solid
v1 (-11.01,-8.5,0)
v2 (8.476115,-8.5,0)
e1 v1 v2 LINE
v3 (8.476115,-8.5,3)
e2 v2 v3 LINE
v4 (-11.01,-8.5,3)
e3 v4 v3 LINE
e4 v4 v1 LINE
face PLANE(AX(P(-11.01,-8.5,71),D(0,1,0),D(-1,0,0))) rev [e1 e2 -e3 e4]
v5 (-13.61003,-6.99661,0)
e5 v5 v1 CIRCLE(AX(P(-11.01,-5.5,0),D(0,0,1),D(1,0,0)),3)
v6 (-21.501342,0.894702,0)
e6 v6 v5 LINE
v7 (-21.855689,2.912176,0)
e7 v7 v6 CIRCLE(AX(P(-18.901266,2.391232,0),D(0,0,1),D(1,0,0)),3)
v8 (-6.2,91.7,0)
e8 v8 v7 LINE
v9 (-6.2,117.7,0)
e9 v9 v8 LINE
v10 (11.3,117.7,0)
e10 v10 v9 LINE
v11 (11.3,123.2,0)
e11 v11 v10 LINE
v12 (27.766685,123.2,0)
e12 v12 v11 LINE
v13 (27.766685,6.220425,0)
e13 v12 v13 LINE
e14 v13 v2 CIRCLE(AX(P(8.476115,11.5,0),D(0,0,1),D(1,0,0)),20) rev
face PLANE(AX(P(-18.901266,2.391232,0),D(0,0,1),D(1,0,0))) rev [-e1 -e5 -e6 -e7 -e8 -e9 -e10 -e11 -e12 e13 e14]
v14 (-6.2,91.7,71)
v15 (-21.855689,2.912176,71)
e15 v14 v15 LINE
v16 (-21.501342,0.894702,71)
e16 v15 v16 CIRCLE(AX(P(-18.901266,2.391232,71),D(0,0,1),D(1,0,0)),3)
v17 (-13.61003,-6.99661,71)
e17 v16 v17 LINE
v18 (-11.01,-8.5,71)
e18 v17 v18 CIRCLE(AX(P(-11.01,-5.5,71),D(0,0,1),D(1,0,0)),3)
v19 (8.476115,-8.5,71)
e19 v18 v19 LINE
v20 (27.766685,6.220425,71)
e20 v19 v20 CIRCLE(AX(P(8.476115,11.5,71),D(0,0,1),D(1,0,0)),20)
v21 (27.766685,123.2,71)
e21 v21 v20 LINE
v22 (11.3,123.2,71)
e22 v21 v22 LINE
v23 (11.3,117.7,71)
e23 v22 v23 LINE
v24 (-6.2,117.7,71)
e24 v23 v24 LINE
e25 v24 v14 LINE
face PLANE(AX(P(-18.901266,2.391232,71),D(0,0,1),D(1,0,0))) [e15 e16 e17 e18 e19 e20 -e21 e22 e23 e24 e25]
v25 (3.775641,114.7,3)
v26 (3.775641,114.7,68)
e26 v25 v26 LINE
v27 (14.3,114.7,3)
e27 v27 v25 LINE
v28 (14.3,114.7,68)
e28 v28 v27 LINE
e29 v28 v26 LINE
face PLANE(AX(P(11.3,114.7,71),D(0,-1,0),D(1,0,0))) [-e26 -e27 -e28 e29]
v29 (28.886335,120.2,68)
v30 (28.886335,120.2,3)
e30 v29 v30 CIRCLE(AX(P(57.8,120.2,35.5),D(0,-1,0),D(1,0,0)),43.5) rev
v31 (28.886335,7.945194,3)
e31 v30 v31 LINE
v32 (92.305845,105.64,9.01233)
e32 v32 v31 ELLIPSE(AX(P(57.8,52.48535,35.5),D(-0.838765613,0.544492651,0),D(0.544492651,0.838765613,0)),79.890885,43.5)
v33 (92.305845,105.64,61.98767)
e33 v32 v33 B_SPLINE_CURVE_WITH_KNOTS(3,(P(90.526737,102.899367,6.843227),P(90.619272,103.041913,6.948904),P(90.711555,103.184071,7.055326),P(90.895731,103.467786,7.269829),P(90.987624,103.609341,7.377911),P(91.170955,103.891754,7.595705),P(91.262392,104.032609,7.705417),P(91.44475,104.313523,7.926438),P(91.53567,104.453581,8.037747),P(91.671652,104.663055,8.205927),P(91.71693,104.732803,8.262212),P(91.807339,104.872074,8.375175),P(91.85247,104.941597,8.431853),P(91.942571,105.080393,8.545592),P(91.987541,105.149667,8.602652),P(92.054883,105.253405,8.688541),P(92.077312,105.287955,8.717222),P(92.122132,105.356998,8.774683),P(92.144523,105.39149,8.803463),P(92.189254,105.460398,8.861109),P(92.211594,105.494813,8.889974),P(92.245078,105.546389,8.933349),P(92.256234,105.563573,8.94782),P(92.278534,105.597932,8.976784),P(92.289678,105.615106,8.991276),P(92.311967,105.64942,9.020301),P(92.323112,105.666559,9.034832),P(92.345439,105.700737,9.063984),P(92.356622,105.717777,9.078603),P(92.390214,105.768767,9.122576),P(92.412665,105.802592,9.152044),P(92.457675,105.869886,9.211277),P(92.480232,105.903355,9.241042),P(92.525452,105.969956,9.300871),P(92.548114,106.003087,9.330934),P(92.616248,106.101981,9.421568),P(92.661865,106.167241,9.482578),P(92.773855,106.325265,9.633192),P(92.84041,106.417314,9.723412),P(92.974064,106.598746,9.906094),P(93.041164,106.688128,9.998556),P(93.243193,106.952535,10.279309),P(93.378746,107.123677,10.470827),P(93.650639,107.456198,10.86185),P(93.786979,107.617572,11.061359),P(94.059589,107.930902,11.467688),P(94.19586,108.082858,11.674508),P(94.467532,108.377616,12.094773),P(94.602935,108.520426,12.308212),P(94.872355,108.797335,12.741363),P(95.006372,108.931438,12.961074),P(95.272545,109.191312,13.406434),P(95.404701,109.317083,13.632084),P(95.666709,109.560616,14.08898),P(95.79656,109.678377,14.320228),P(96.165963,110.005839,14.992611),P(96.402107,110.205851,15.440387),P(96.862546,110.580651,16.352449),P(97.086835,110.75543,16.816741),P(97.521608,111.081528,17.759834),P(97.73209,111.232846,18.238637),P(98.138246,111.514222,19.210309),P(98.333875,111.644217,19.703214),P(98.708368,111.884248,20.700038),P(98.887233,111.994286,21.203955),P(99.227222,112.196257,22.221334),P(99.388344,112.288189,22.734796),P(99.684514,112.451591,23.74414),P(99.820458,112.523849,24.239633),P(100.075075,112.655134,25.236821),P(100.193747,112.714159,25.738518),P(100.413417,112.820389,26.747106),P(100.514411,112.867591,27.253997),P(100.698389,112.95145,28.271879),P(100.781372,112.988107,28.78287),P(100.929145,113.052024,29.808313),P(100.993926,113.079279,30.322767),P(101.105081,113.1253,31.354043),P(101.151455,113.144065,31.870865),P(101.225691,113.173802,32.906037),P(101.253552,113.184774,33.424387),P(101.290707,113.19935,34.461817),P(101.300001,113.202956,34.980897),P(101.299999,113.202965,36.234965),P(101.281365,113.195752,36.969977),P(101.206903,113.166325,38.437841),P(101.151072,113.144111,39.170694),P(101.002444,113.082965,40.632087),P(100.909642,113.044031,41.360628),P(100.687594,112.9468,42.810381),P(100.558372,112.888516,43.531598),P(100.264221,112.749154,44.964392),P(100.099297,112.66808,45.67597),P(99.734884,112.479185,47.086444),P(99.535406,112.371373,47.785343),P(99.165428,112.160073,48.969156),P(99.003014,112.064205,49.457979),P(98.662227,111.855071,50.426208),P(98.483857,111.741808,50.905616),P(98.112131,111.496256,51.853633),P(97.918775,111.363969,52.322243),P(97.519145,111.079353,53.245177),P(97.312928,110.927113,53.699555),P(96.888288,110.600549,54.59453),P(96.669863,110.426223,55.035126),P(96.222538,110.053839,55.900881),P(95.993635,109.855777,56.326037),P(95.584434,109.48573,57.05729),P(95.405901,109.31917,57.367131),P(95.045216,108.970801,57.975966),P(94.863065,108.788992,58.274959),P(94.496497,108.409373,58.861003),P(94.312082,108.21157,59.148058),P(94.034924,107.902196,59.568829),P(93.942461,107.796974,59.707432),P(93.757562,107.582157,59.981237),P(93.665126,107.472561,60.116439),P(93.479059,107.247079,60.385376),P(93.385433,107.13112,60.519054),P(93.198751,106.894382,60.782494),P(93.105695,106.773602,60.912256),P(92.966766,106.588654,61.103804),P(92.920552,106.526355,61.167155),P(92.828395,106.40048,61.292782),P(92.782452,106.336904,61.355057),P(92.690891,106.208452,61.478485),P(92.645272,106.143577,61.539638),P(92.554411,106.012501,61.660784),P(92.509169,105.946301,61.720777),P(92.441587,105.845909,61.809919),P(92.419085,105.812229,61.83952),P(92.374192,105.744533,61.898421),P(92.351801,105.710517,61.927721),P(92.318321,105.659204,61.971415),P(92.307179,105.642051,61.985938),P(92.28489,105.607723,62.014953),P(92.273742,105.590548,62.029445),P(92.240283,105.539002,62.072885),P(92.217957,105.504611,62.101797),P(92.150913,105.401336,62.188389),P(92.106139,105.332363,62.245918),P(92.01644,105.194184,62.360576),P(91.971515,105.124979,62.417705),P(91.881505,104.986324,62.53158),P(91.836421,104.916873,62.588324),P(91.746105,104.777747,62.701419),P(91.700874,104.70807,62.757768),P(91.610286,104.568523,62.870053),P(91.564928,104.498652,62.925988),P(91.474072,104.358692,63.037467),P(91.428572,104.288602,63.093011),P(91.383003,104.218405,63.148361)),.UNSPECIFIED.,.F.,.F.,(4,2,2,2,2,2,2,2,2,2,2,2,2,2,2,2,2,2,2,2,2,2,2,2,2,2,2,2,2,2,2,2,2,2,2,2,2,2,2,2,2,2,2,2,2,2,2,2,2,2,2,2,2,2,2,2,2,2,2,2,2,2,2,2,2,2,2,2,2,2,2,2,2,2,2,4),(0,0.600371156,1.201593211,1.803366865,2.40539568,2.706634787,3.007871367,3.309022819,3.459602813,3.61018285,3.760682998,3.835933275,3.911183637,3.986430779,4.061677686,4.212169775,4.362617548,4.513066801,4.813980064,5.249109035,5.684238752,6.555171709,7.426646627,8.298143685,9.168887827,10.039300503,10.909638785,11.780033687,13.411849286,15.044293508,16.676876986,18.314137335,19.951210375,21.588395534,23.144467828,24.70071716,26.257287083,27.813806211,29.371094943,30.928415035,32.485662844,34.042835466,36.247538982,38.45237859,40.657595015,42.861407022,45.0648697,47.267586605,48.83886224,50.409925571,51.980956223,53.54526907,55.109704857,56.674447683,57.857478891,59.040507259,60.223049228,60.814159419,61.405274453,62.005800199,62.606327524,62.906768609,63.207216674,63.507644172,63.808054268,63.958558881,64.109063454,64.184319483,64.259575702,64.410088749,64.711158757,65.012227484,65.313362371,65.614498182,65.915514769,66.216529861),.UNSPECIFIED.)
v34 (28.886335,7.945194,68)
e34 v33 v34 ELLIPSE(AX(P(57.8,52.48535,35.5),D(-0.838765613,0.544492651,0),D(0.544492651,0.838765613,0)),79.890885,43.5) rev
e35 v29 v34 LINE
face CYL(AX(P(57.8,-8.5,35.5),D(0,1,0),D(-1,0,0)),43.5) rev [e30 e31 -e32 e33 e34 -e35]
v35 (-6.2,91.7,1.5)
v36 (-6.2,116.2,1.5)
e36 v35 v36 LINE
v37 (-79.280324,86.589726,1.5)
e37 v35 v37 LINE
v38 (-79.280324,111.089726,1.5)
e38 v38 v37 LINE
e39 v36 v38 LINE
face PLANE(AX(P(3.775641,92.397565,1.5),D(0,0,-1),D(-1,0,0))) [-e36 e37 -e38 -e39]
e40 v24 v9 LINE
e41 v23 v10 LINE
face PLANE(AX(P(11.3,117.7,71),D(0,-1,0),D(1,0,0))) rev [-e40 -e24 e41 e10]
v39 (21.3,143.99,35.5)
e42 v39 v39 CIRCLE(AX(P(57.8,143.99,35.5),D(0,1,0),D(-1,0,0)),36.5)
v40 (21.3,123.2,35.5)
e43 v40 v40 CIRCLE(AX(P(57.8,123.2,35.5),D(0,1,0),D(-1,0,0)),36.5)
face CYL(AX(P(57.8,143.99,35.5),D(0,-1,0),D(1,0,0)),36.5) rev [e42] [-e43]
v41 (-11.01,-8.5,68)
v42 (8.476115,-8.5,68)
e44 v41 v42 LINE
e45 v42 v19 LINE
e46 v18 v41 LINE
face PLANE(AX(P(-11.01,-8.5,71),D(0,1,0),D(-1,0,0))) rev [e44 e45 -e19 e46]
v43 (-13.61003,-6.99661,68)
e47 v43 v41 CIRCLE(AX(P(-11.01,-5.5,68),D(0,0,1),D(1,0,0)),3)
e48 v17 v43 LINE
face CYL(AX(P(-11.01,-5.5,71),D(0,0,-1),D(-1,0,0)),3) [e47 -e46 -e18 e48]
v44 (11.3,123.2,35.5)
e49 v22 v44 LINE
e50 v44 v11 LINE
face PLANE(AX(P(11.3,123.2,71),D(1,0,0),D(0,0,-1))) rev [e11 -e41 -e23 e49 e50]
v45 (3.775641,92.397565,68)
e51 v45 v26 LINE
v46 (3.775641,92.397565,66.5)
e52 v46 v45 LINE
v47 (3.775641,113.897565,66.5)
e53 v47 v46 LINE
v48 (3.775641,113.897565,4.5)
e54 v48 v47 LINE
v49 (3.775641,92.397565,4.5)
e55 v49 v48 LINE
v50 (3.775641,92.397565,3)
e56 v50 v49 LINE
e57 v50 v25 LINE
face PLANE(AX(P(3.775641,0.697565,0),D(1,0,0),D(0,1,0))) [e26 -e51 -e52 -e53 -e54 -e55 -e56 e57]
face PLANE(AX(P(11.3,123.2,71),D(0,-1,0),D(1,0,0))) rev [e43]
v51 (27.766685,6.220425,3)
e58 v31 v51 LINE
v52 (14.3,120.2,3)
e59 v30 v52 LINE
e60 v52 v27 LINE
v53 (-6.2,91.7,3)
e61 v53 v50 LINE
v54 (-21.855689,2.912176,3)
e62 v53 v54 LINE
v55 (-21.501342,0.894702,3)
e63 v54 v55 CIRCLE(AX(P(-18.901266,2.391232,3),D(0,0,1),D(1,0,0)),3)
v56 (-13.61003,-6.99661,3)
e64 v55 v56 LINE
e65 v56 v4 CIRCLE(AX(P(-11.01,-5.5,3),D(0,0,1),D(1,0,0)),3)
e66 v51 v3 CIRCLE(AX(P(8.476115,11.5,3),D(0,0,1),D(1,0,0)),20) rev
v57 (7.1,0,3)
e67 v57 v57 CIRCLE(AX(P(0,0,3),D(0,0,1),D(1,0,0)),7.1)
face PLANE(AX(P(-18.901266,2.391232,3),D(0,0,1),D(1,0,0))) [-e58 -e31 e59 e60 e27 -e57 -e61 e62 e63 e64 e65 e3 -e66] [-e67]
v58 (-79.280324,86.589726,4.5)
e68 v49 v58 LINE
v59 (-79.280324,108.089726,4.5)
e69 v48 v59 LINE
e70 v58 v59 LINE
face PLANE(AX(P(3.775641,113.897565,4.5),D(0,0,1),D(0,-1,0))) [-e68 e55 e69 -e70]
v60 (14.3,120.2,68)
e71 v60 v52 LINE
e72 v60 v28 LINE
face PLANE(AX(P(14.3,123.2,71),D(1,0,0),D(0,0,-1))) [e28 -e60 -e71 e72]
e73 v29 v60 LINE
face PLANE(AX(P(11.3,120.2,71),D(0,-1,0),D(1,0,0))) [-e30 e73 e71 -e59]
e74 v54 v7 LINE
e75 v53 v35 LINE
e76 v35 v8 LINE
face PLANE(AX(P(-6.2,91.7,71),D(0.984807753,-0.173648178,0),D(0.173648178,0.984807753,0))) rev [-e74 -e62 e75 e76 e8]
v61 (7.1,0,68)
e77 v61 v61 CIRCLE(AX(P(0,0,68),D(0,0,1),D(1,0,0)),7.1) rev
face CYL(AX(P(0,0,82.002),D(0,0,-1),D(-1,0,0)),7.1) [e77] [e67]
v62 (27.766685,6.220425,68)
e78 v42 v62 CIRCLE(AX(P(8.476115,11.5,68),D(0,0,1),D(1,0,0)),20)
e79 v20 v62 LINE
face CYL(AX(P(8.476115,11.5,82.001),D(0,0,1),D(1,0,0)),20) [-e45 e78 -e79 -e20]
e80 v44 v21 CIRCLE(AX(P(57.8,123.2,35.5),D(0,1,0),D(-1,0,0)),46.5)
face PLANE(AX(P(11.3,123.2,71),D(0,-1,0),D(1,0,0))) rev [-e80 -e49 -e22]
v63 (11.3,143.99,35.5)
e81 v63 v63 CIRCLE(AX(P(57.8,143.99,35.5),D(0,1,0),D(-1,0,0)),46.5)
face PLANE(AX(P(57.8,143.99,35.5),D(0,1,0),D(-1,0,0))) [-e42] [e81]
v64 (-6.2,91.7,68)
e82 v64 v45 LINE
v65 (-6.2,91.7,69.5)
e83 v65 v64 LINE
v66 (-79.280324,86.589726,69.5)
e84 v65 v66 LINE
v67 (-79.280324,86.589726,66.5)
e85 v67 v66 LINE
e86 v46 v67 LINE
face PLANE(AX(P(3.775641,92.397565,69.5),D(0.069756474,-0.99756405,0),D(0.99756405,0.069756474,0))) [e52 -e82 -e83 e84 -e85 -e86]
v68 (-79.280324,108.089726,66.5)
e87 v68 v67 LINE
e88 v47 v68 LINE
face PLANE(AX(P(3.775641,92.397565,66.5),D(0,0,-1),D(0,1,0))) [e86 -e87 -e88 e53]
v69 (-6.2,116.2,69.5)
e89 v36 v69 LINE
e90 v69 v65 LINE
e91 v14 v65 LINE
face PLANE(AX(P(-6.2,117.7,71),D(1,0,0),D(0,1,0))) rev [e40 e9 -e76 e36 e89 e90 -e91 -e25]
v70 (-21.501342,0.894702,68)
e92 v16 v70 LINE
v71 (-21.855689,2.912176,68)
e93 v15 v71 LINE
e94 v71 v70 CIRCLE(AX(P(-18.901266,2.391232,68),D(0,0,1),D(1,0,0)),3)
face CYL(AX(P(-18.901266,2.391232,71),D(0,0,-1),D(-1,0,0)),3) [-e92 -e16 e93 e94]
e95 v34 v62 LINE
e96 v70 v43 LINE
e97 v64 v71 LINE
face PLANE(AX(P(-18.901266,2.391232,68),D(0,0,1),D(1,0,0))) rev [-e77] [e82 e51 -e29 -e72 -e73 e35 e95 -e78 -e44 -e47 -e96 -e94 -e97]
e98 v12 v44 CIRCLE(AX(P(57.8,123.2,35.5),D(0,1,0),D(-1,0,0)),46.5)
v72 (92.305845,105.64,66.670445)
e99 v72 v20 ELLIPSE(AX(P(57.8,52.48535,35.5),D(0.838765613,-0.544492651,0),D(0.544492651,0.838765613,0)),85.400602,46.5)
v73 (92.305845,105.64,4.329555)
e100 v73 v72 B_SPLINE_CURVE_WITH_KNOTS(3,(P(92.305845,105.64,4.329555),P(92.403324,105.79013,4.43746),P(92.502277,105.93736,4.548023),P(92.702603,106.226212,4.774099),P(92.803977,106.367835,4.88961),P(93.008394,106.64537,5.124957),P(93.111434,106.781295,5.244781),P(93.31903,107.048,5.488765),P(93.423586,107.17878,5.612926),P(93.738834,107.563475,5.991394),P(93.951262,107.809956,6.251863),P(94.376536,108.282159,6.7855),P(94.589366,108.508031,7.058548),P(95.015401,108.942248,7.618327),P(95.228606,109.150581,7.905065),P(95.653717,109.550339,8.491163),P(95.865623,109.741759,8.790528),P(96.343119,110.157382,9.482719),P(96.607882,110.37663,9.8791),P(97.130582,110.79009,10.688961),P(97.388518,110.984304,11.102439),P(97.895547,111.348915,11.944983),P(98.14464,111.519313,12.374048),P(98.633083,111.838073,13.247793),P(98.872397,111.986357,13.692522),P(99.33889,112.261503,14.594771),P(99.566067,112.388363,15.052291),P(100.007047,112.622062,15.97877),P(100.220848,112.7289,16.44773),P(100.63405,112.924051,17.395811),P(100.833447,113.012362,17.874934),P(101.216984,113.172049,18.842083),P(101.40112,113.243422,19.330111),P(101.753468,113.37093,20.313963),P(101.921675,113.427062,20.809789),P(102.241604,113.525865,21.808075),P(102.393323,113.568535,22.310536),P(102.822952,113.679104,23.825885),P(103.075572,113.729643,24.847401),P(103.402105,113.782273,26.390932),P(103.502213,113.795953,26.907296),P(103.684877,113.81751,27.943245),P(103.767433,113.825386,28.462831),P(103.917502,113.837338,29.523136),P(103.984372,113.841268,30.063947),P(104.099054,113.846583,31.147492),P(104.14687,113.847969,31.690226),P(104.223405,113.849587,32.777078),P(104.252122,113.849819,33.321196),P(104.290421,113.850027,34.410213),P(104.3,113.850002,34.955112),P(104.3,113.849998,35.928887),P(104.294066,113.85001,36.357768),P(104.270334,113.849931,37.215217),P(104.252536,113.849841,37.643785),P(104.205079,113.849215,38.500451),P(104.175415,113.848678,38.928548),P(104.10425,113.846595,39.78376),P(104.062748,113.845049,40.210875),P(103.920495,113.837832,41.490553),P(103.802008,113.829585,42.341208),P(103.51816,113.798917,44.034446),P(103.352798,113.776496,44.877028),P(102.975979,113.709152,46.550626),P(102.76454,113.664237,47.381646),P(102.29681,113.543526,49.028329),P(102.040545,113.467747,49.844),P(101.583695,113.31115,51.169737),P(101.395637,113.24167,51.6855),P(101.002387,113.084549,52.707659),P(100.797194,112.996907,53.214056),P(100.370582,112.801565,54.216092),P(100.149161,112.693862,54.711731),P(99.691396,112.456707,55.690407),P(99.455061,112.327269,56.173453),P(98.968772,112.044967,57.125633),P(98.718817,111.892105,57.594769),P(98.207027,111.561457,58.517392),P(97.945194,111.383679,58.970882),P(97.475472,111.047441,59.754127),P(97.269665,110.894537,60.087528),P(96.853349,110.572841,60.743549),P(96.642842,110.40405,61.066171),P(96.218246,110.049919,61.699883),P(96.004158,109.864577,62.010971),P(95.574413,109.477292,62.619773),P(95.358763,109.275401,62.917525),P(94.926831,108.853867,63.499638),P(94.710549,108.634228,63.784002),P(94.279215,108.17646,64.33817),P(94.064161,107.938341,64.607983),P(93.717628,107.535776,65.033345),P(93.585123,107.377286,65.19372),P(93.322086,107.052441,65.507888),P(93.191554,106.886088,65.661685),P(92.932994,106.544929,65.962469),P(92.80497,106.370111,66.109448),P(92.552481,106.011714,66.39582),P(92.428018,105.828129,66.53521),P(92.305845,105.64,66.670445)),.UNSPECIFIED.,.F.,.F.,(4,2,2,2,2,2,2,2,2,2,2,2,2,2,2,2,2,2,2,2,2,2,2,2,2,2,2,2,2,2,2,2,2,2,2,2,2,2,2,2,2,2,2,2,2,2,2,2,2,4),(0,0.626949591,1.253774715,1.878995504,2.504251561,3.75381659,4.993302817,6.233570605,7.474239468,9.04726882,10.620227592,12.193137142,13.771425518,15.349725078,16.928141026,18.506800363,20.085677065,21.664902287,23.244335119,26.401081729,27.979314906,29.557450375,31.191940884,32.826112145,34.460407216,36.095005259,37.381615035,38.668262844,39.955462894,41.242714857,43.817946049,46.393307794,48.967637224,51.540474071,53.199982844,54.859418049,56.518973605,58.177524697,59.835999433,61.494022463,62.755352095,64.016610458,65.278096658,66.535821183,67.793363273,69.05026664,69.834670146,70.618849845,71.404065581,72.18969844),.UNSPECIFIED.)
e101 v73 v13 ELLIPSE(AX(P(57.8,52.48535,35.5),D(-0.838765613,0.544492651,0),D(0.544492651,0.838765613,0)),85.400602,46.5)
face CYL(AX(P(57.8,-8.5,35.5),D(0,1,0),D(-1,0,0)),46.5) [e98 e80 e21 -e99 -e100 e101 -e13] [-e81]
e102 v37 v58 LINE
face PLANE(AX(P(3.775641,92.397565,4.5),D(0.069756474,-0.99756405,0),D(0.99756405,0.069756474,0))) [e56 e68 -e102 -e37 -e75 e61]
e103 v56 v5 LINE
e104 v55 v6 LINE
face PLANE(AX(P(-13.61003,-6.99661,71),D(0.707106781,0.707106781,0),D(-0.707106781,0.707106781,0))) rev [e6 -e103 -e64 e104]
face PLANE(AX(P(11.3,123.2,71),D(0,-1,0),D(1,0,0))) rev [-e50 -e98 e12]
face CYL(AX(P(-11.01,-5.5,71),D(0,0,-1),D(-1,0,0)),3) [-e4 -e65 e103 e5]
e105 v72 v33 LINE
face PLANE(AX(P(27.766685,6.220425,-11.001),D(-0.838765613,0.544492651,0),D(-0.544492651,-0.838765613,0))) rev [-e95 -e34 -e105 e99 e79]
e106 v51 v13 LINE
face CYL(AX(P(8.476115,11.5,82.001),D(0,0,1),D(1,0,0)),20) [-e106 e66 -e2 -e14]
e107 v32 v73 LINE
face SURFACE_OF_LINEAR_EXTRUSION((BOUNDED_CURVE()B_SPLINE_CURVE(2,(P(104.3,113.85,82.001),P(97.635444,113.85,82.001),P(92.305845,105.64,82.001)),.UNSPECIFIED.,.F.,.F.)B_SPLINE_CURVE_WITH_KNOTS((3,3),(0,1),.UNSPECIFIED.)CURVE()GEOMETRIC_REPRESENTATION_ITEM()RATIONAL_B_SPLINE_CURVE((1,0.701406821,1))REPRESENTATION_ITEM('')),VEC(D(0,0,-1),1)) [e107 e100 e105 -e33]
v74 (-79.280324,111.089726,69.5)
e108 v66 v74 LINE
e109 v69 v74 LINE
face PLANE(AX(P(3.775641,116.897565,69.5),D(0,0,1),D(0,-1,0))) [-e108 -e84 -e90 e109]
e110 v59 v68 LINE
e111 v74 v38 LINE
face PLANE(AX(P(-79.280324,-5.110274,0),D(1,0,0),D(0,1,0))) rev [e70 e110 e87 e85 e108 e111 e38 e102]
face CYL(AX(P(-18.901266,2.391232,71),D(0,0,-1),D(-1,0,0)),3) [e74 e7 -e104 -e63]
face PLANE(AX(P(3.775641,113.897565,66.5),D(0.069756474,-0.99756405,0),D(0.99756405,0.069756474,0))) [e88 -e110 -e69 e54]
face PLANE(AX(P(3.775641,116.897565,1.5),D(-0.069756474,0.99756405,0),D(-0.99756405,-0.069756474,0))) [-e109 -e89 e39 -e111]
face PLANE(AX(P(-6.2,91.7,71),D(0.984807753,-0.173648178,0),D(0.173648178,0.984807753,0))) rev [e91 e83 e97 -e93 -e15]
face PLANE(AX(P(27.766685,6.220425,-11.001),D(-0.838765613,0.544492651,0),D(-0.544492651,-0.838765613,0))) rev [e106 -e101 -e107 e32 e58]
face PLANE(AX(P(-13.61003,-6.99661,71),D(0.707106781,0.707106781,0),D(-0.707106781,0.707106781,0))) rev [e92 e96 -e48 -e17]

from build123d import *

# Parameters (mm, degrees)
ESTRUSIONE_ESTRUSIONE1_DEPTH         = 71
ESTRUSIONE_ESTRUSIONE5_START         = -131.7
SCHIZZO8_R                           = 46.5
ESTRUSIONE_ESTRUSIONE5_DEPTH         = 131.7
TAGLIO_ESTRUSIONE1_REACH             = 183.054
TAGLIO_ESTRUSIONE1_DIRECTION_2_REACH = 183.054
RACCORDO1_R                          = 20
TAGLIO_ESTRUSIONE2_REACH             = 188.942
SVUOTA1_START                        = -8.5
SVUOTA1_DEPTH                        = 123.2
SVUOTA1_START_2                      = 114.7
SVUOTA1_2_DEPTH                      = 5.5
ESTRUSIONE_ESTRUSIONE7_START         = 1.5
ESTRUSIONE_ESTRUSIONE7_DEPTH         = 68
ESTRUSIONE_ESTRUSIONE7_2_DEPTH       = 3
ESTRUSIONE_ESTRUSIONE7_START_2       = 66.5
ESTRUSIONE_ESTRUSIONE7_3_DEPTH       = 3
SCHIZZO15_R                          = 46.5
SCHIZZO15_R_2                        = 36.5
ESTRUSIONE_ESTRUSIONE8_DEPTH         = 20.79
ESTRUSIONE_ESTRUSIONE9_REACH         = 196.557
SCHIZZO16_R                          = 7.1


# Read off the part's stored shape, not the designer's step: Svuota1, Estrusione-Estrusione7
with BuildPart() as part:
    # Schizzo1 → Estrusione-Estrusione1 (new body)
    with BuildSketch(Plane.XY):
        with BuildLine():
            Line((11.3, 123.2), (104.3, 123.2))
            Line((104.3, 123.2), (104.3, 113.85))
            Line((104.3, 113.85), (24.875337306, -8.5))
            Line((24.875337306, -8.5), (-11.01, -8.5))
            ThreePointArc((-11.01, -8.5), (-12.511694022, -8.09709743), (-13.610030458, -6.996610042))
            Line((-13.610030458, -6.996610042), (-21.501342136, 0.894701636))
            ThreePointArc((-21.501342136, 0.894701636), (-21.856035983, 1.872259448), (-21.855688892, 2.912176215))
            Line((-21.855688892, 2.912176215), (-6.2, 91.7))
            Line((-6.2, 91.7), (-6.2, 117.7))
            Line((-6.2, 117.7), (11.3, 117.7))
            Line((11.3, 117.7), (11.3, 123.2))
        make_face()
    extrude(amount=ESTRUSIONE_ESTRUSIONE1_DEPTH)

    # Schizzo8 → Estrusione-Estrusione5 (add)
    with BuildSketch(Plane(origin=(0, 123.2, 0), x_dir=(1, 0, 0), z_dir=(0, 1, 0)).offset(ESTRUSIONE_ESTRUSIONE5_START)):
        with Locations((57.8, -35.5)):
            Circle(SCHIZZO8_R)
    extrude(amount=ESTRUSIONE_ESTRUSIONE5_DEPTH)

    # Schizzo9 → Taglio-Estrusione1 (cut, up to next)
    with BuildSketch(Plane.XY, mode=Mode.PRIVATE) as taglio_estrusione1_sk1:
        with BuildLine():
            Line((27.766685165, 6.220424861), (92.30584512, 105.64))
            add(Edge.make_bspline(
                [(92.30584512, 105.64), (97.635444472, 113.85), (104.3, 113.85)],
                knots=[0, 0, 0, 1, 1, 1], degree=2, weights=[1, 0.701406821, 1]))
            Line((104.3, 113.85), (104.3, -8.5))
            Line((104.3, -8.5), (27.766685165, -8.5))
            Line((27.766685165, -8.5), (27.766685165, 6.220424861))
        make_face()
    taglio_estrusione1_tool1 = extrude(taglio_estrusione1_sk1.sketch, amount=TAGLIO_ESTRUSIONE1_REACH, mode=Mode.PRIVATE) & part.part
    add(taglio_estrusione1_tool1.solids().sort_by_distance((76.036213, 35.53967, 0))[0], mode=Mode.SUBTRACT)

    # Schizzo9 → Taglio-Estrusione1 direction 2 (cut, up to next)
    with BuildSketch(Plane.XY, mode=Mode.PRIVATE) as taglio_estrusione1_direction_2_sk1:
        with BuildLine():
            Line((27.766685165, 6.220424861), (92.30584512, 105.64))
            add(Edge.make_bspline(
                [(92.30584512, 105.64), (97.635444472, 113.85), (104.3, 113.85)],
                knots=[0, 0, 0, 1, 1, 1], degree=2, weights=[1, 0.701406821, 1]))
            Line((104.3, 113.85), (104.3, -8.5))
            Line((104.3, -8.5), (27.766685165, -8.5))
            Line((27.766685165, -8.5), (27.766685165, 6.220424861))
        make_face()
    taglio_estrusione1_direction_2_tool1 = extrude(taglio_estrusione1_direction_2_sk1.sketch, amount=-TAGLIO_ESTRUSIONE1_DIRECTION_2_REACH, mode=Mode.PRIVATE) & part.part
    add(taglio_estrusione1_direction_2_tool1.solids().sort_by_distance((76.036213, 35.53967, 0))[0], mode=Mode.SUBTRACT)

    # Raccordo1
    # the kernel refuses this fillet: 20 mm, written as the material it takes off along each edge
    with BuildSketch(Plane(origin=(27.766685165, -8.5, -48.226424704), x_dir=(-1, 0, 0), z_dir=(0, 0, 1))) as raccordo1_piece_1:
        with BuildLine():
            CenterArc((19.290569882, -20), RACCORDO1_R, 90, 74.693720794)
            Line((0, -14.720424861), (-0.385811398, -14.614833358))
            ThreePointArc((-0.385811398, -14.614833358), (-0.4, -7.360212431), (-0.4, 0))
            Line((-0.4, 0), (0, 0.4))
            Line((0, 0.4), (19.290569882, 0.4))
            Line((19.290569882, 0.4), (19.290569882, 0))
        make_face()
    extrude(amount=167.452849408, mode=Mode.SUBTRACT)

    # Schizzo10 → Taglio-Estrusione2 (cut, up to next)
    with BuildSketch(Plane(origin=(0, 123.2, 0), x_dir=(1, 0, 0), z_dir=(0, 1, 0)), mode=Mode.PRIVATE) as taglio_estrusione2_sk1:
        with BuildLine():
            Line((104.3, 0), (87.833314835, 0))
            ThreePointArc((87.833314835, 0), (99.982929872, -15.933435984), (104.3, -35.500000151))
            Line((104.3, -35.500000151), (104.3, 0))
        make_face()
    taglio_estrusione2_tool1 = extrude(taglio_estrusione2_sk1.sketch, amount=-TAGLIO_ESTRUSIONE2_REACH, mode=Mode.PRIVATE) & part.part
    # Schizzo10 → Taglio-Estrusione2 (cut, up to next)
    with BuildSketch(Plane(origin=(0, 123.2, 0), x_dir=(1, 0, 0), z_dir=(0, 1, 0)), mode=Mode.PRIVATE) as taglio_estrusione2_sk2:
        with BuildLine():
            Line((104.3, -71), (104.3, -35.500000151))
            ThreePointArc((104.3, -35.500000151), (99.982929809, -55.066564153), (87.833314835, -71))
            Line((87.833314835, -71), (104.3, -71))
        make_face()
    taglio_estrusione2_tool2 = extrude(taglio_estrusione2_sk2.sketch, amount=-TAGLIO_ESTRUSIONE2_REACH, mode=Mode.PRIVATE) & part.part
    add(taglio_estrusione2_tool1.solids().sort_by_distance((99.557164, 123.2, 8.530088))[0], mode=Mode.SUBTRACT)
    add(taglio_estrusione2_tool2.solids().sort_by_distance((99.557164, 123.2, 62.469912))[0], mode=Mode.SUBTRACT)

    # Svuota1 outline → Svuota1 (cut)
    with BuildSketch(Plane(origin=(0, 0, 0), x_dir=(1, 0, 0), z_dir=(0, 1, 0)).offset(SVUOTA1_START)):
        with BuildLine():
            ThreePointArc((28.88633541, -68), (101.3, -35.5), (28.88633541, -3))
            Line((28.88633541, -3), (-23, -3))
            Line((-23, -3), (-23, -68))
            Line((-23, -68), (28.88633541, -68))
        make_face()
    extrude(amount=SVUOTA1_DEPTH, mode=Mode.SUBTRACT)

    # Svuota1 2 outline → Svuota1 2 (cut)
    with BuildSketch(Plane(origin=(0, 0, 0), x_dir=(1, 0, 0), z_dir=(0, 1, 0)).offset(SVUOTA1_START_2)):
        with BuildLine():
            Line((14.3, -3), (14.3, -68))
            Line((14.3, -68), (28.88633541, -68))
            ThreePointArc((28.88633541, -68), (101.3, -35.5), (28.88633541, -3))
            Line((28.88633541, -3), (14.3, -3))
        make_face()
    extrude(amount=SVUOTA1_2_DEPTH, mode=Mode.SUBTRACT)

    # Estrusione-Estrusione7 outline → Estrusione-Estrusione7 (add)
    with BuildSketch(Plane.XY.offset(ESTRUSIONE_ESTRUSIONE7_START)):
        Polygon((-6.2, 114.7), (-6.2, 116.2), (-79.280324347, 111.089725903), (-79.280324347, 108.089725903), (3.775640503, 113.897564737), (3.775640503, 114.7), align=None)
    extrude(amount=ESTRUSIONE_ESTRUSIONE7_DEPTH)

    # Estrusione-Estrusione7 2 outline → Estrusione-Estrusione7 2 (add)
    with BuildSketch(Plane.XY.offset(ESTRUSIONE_ESTRUSIONE7_START)):
        Polygon((-79.280324347, 108.089725903), (-79.280324347, 86.589725903), (3.775640503, 92.397564737), (3.775640503, 113.897564737), align=None)
    extrude(amount=ESTRUSIONE_ESTRUSIONE7_2_DEPTH)

    # Estrusione-Estrusione7 3 outline → Estrusione-Estrusione7 3 (add)
    with BuildSketch(Plane.XY.offset(ESTRUSIONE_ESTRUSIONE7_START_2)):
        Polygon((-79.280324347, 108.089725903), (-79.280324347, 86.589725903), (3.775640503, 92.397564737), (3.775640503, 113.897564737), align=None)
    extrude(amount=ESTRUSIONE_ESTRUSIONE7_3_DEPTH)

    # Schizzo15 → Estrusione-Estrusione8 (add)
    with BuildSketch(Plane(origin=(0, 123.2, 0), x_dir=(1, 0, 0), z_dir=(0, 1, 0))):
        with Locations(Location((57.8, -35.5, 0), (0, 0, 180))):
            Circle(SCHIZZO15_R)
        with Locations(Location((57.8, -35.5, 0), (0, 0, 180))):
            Circle(SCHIZZO15_R_2, mode=Mode.SUBTRACT)
    extrude(amount=ESTRUSIONE_ESTRUSIONE8_DEPTH)

    # Schizzo16 → Estrusione-Estrusione9 (add, up to next)
    with BuildSketch(Plane.XY.offset(3), mode=Mode.PRIVATE) as estrusione_estrusione9_sk1:
        Circle(SCHIZZO16_R)
    estrusione_estrusione9_tool1 = extrude(estrusione_estrusione9_sk1.sketch, amount=ESTRUSIONE_ESTRUSIONE9_REACH, mode=Mode.PRIVATE) - part.part
    add(estrusione_estrusione9_tool1.solids().sort_by_distance((0, 0, 3))[0])


solid = part.part
